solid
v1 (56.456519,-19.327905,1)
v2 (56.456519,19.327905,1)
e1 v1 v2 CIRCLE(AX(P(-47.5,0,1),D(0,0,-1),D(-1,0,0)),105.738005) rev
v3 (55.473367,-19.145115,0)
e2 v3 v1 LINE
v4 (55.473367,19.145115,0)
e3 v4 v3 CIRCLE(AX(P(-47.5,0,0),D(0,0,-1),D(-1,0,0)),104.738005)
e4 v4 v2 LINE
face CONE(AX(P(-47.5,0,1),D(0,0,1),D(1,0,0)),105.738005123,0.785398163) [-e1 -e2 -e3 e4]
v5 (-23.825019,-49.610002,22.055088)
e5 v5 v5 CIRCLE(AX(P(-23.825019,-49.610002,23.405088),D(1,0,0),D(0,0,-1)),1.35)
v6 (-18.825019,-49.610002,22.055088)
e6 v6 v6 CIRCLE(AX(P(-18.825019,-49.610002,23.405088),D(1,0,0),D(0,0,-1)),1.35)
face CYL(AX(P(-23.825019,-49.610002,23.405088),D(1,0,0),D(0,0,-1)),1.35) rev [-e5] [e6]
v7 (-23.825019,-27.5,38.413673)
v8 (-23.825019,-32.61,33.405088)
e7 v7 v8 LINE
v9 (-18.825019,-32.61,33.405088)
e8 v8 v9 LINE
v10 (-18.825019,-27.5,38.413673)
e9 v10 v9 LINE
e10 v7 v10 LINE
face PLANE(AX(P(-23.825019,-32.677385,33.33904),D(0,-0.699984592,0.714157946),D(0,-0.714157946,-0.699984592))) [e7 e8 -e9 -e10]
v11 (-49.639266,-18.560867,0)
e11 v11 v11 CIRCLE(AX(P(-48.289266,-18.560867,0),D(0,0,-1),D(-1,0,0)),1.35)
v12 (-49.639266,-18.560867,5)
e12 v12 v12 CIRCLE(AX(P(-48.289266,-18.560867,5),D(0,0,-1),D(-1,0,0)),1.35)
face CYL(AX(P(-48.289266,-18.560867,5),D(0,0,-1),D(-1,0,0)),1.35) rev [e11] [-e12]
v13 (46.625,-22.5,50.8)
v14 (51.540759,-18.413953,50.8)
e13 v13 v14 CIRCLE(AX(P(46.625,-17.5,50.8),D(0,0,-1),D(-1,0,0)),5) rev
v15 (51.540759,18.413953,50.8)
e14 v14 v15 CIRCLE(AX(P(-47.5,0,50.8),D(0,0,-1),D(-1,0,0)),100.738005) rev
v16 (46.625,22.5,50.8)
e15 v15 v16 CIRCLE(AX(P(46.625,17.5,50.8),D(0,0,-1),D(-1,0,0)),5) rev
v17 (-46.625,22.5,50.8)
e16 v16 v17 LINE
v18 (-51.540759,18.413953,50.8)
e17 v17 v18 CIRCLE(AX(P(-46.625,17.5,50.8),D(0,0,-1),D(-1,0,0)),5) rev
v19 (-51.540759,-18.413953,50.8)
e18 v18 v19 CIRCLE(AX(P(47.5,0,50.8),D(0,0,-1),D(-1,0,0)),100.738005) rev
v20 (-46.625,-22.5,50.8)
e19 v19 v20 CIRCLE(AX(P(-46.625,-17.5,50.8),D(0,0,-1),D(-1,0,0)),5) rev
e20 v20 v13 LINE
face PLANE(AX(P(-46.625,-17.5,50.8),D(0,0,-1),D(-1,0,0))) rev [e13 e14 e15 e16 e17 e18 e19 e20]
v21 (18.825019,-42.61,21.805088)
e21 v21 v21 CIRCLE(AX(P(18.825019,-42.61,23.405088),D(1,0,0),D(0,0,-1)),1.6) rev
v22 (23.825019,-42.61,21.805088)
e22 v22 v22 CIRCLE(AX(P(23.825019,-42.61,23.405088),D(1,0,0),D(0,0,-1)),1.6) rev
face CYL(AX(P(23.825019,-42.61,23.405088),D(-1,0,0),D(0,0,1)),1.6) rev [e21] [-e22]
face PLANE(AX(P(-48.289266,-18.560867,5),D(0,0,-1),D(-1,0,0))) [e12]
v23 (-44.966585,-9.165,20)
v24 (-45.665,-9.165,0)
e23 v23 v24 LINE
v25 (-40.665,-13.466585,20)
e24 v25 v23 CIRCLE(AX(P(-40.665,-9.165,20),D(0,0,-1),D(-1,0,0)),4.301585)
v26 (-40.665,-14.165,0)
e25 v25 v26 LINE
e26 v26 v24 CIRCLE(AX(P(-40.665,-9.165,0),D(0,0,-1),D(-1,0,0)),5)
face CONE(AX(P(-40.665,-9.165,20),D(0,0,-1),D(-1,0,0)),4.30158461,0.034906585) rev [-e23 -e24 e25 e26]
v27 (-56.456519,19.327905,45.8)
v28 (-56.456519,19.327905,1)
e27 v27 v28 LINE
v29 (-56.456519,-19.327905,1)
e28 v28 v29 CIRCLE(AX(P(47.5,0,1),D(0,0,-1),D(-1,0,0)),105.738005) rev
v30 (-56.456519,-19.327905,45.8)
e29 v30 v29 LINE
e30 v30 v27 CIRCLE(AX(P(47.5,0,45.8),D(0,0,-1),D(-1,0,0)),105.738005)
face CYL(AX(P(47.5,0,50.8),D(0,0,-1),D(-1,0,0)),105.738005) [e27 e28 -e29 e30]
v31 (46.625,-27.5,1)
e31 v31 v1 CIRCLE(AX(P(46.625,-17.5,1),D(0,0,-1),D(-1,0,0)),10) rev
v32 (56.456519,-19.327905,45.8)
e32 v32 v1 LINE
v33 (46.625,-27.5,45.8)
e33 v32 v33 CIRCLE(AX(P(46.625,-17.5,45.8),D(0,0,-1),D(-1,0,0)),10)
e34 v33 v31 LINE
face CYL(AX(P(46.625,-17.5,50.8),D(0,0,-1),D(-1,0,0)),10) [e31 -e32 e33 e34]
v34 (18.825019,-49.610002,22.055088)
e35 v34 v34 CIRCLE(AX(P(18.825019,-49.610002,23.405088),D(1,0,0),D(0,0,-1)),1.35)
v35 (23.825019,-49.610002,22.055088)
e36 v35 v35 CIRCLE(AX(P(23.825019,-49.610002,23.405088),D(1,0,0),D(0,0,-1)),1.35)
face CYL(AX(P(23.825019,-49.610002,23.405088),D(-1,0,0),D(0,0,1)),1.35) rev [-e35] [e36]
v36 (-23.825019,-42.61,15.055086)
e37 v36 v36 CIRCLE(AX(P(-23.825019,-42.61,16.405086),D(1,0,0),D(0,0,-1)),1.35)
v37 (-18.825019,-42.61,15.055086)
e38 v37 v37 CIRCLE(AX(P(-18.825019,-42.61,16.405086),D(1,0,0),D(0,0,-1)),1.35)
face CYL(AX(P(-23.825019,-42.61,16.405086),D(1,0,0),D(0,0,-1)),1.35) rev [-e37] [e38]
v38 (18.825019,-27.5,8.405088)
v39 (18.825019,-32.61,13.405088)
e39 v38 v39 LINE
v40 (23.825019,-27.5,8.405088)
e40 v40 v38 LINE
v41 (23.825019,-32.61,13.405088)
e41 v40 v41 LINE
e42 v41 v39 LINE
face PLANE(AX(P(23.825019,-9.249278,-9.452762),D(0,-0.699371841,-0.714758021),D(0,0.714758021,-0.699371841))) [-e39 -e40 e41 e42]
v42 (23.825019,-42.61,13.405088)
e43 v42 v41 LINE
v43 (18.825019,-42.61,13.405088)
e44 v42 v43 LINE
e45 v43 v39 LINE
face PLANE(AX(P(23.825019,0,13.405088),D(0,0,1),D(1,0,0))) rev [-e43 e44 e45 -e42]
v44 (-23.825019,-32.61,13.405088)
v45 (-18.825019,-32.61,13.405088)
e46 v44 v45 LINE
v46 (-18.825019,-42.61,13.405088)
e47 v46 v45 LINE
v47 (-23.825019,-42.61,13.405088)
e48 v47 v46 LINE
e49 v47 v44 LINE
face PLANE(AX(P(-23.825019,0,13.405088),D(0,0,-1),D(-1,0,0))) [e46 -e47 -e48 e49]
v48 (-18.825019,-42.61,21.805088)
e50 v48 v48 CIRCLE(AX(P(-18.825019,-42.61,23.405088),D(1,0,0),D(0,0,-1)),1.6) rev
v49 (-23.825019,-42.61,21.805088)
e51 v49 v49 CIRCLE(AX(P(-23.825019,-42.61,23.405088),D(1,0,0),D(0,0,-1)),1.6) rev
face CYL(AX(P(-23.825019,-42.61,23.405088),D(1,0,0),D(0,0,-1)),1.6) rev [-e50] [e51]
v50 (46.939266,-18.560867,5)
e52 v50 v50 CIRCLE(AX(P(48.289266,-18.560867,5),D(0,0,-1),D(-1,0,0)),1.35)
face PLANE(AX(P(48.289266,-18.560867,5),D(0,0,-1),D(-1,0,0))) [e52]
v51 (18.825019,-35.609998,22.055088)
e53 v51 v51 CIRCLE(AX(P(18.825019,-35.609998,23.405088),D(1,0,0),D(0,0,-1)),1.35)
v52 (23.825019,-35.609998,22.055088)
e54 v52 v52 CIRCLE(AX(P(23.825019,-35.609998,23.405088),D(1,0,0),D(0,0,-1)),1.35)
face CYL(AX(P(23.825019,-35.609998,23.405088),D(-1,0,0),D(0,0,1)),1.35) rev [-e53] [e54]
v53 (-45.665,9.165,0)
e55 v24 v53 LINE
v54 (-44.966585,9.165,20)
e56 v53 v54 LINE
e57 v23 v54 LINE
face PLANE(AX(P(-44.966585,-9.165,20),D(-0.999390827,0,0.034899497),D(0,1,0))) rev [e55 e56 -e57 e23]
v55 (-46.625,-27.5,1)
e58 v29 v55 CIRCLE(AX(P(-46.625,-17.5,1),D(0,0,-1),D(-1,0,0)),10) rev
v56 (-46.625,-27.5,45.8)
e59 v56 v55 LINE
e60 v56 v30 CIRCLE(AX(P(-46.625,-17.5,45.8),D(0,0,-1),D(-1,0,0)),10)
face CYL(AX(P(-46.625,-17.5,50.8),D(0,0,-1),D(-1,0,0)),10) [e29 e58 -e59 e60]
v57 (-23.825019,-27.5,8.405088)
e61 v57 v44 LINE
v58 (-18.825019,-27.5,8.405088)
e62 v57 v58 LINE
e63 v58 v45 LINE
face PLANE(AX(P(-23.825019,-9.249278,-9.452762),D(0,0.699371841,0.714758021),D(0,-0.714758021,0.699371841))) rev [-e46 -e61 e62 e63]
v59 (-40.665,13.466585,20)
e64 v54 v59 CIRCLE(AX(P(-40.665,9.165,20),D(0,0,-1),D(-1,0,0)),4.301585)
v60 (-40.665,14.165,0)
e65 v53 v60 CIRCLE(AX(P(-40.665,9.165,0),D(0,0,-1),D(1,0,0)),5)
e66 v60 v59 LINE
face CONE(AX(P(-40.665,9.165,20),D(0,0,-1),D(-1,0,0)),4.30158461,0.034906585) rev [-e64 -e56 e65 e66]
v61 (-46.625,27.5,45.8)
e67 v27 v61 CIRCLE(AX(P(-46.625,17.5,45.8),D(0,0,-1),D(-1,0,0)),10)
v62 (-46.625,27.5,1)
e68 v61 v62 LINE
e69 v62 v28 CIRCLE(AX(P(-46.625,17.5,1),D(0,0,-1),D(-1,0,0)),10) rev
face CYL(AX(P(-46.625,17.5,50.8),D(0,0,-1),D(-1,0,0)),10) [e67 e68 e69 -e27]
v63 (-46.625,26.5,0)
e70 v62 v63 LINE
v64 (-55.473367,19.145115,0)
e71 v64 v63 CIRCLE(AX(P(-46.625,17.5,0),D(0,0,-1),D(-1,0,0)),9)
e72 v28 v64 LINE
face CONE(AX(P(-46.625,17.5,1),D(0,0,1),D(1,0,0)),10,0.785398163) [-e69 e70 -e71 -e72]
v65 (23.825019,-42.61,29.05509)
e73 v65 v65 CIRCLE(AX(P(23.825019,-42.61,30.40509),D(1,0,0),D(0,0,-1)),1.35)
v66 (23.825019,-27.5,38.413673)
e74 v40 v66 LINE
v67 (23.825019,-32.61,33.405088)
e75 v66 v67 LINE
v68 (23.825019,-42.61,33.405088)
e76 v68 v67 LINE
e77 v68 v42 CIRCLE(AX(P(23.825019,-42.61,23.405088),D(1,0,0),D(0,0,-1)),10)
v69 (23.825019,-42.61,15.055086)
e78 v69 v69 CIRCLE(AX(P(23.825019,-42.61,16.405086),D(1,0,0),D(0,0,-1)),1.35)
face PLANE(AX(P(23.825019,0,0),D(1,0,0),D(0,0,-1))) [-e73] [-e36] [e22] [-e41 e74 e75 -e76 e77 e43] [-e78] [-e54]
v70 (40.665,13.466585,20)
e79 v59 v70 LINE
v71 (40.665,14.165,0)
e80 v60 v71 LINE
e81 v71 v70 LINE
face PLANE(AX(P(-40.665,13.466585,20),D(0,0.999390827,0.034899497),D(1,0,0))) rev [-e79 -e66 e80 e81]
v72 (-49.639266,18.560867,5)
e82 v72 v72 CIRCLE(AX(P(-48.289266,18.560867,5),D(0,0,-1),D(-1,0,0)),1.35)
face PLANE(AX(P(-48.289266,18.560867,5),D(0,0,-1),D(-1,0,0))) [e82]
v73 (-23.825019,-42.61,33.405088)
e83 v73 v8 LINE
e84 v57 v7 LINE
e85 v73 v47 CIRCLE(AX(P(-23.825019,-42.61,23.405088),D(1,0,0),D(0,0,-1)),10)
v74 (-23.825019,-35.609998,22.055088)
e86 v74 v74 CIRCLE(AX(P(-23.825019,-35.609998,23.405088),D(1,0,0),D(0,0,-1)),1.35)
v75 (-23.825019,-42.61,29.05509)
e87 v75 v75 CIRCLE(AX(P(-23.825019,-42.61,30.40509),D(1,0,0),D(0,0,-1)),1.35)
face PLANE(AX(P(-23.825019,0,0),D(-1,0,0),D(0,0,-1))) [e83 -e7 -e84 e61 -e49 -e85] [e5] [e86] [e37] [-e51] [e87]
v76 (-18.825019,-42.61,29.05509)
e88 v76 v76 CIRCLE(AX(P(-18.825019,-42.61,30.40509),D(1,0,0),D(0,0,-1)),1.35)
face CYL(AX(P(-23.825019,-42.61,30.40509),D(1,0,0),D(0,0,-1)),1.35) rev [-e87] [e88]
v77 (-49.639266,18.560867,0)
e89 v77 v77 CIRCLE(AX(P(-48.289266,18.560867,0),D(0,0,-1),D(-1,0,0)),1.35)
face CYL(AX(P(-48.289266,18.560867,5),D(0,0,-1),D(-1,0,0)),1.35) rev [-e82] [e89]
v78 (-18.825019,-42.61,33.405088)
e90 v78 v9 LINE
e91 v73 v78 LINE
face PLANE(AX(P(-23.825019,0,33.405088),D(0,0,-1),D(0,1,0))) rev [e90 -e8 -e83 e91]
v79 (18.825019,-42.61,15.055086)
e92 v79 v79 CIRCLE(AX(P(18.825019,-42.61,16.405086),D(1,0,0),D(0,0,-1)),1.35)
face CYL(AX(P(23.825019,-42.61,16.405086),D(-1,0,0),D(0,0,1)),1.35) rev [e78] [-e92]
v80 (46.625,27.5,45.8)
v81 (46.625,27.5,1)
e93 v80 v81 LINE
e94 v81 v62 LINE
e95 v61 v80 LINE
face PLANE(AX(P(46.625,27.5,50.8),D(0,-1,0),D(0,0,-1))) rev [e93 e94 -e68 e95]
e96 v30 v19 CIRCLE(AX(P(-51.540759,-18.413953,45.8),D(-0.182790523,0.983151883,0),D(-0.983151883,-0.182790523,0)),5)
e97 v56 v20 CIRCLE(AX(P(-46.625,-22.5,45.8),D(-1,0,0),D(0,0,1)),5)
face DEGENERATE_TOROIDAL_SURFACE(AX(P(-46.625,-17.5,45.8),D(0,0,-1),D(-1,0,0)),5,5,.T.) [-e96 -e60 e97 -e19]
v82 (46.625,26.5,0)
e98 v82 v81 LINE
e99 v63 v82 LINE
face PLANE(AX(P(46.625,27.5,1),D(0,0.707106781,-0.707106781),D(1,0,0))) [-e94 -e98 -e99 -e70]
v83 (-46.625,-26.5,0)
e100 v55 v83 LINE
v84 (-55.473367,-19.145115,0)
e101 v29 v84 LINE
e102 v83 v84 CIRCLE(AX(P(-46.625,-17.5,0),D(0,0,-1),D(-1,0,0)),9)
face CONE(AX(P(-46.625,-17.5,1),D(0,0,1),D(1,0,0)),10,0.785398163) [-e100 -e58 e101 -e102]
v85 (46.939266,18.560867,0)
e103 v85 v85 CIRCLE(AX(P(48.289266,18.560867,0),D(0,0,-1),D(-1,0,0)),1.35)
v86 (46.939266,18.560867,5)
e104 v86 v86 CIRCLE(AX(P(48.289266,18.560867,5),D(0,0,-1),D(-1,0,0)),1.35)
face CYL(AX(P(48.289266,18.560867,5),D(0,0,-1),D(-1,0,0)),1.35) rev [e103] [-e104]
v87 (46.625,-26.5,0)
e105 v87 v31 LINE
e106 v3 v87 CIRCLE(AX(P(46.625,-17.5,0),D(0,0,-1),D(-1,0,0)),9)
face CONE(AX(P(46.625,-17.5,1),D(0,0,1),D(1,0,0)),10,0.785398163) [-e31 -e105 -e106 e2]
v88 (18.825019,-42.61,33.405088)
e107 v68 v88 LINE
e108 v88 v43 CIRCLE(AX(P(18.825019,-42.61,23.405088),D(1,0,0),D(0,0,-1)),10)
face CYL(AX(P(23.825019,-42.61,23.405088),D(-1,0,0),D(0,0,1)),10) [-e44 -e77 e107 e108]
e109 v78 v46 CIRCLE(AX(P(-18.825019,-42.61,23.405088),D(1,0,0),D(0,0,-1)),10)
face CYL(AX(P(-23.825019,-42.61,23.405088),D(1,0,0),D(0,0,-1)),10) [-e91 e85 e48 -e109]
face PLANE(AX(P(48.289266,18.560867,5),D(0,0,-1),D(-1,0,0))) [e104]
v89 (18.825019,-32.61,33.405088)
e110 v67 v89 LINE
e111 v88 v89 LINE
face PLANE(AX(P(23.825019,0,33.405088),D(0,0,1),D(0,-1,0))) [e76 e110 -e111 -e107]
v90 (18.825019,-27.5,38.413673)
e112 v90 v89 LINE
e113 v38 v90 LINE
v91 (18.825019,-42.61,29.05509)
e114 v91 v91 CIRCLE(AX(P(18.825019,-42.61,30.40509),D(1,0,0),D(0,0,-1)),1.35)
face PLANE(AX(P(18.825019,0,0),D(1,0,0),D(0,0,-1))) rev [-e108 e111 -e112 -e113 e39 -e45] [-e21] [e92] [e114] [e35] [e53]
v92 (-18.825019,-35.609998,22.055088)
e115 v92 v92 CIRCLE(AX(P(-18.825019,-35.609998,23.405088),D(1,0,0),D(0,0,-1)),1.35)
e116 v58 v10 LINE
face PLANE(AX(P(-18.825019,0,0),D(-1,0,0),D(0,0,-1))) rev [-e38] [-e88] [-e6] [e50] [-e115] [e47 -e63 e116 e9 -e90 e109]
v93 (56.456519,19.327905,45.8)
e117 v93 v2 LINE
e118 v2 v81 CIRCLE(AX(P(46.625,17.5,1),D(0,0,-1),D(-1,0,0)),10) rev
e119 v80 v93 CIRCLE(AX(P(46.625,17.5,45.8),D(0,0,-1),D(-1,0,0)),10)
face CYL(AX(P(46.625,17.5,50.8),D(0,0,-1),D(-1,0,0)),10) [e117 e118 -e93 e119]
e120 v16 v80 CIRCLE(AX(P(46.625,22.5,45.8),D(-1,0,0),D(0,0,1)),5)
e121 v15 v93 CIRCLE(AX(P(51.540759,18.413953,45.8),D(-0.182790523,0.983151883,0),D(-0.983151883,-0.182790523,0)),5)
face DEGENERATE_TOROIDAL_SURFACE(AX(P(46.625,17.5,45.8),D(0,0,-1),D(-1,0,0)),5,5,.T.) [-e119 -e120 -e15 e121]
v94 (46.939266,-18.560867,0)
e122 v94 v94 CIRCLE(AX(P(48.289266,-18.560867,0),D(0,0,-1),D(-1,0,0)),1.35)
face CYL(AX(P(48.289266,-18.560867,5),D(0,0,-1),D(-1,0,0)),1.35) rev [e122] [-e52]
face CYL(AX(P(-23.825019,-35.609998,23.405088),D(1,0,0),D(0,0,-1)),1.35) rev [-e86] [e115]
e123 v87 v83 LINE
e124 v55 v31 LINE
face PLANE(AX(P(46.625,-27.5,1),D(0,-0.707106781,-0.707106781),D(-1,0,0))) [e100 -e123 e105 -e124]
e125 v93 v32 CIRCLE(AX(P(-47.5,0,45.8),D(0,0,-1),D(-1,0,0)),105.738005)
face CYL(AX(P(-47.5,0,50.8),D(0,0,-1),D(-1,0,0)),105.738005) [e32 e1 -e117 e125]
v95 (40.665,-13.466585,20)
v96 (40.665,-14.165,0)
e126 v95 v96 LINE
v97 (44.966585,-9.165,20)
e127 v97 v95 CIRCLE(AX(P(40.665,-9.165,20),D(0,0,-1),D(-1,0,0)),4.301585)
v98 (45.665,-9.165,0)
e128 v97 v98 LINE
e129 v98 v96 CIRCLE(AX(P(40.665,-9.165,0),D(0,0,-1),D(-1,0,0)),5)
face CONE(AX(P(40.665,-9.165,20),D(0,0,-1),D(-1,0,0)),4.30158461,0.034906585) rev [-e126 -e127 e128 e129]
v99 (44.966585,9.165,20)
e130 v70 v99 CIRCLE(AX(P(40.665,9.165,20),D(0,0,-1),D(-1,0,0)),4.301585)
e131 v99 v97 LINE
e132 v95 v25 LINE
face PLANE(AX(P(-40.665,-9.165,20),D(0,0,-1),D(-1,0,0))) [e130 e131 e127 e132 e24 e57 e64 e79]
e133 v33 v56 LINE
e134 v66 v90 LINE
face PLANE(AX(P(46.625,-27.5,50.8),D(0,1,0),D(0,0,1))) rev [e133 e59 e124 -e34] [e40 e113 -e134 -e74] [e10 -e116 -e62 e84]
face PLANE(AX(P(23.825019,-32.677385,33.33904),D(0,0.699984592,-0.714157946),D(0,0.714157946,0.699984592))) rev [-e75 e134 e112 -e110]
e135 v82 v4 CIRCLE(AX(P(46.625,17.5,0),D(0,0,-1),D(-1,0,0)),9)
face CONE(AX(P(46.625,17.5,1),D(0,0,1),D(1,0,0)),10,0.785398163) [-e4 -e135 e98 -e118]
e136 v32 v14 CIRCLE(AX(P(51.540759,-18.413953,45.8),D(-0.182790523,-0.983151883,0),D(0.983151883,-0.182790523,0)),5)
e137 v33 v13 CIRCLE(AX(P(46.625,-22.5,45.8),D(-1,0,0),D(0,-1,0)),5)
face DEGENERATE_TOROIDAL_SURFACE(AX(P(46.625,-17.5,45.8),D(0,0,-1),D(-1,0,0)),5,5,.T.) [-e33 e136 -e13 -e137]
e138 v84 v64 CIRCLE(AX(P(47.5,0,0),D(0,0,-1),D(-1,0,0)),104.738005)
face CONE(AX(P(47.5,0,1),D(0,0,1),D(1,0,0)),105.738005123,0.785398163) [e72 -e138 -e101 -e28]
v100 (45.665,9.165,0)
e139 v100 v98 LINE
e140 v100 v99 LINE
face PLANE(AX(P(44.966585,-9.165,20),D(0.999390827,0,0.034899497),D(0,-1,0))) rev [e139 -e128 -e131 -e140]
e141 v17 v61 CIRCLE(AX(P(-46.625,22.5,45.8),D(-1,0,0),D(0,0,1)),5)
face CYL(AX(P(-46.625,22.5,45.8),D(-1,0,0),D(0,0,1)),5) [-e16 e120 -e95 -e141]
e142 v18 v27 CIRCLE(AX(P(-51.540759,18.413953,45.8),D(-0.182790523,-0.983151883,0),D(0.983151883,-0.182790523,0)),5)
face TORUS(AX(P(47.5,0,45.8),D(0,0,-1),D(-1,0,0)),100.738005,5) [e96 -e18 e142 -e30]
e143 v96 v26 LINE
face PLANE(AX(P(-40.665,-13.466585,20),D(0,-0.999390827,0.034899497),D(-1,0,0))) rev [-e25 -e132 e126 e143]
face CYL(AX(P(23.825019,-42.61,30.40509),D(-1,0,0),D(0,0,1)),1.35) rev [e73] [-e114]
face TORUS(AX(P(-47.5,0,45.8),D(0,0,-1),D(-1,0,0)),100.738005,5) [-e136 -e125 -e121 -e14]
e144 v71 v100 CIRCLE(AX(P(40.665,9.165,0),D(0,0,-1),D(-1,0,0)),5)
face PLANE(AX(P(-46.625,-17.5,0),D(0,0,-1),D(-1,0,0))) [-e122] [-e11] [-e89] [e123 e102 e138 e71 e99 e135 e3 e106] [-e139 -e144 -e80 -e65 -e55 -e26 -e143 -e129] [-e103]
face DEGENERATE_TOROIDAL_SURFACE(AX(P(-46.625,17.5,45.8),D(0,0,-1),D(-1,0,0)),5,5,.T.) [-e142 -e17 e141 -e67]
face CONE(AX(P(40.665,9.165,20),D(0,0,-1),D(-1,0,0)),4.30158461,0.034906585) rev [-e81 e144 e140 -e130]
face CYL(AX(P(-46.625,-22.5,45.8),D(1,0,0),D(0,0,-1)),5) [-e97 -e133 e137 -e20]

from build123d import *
from OCP.BRepFilletAPI import BRepFilletAPI_MakeChamfer

# Parameters (mm, degrees)
BOSS_EXTRUDE5_DEPTH = 50.8
FILLET9_R           = 5
CHAMFER1_SIZE       = 1
SKETCH8_R           = 1.35
BOSS_EXTRUDE6_DEPTH = 5
CUT_EXTRUDE3_DEPTH  = 20
CHAMFER2_SIZE       = 20
CHAMFER2_SIZE_2     = 0.69841539
SKETCH15_R          = 1.35
CUT_EXTRUDE4_DEPTH  = 5


with BuildPart() as part:
    # Sketch2 → Boss-Extrude5 (new body)
    with BuildSketch(Plane.XY):
        with BuildLine():
            Line((46.625, 27.5), (-46.625, 27.5))
            ThreePointArc((-46.625, 27.5), (-53.017219792, 25.190222762), (-56.456518829, 19.327905227))
            ThreePointArc((-56.456518829, 19.327905227), (-58.238005123, 0), (-56.456518829, -19.327905227))
            ThreePointArc((-56.456518829, -19.327905227), (-53.017219792, -25.190222762), (-46.625, -27.5))
            Line((-46.625, -27.5), (46.625, -27.5))
            ThreePointArc((46.625, -27.5), (53.017219792, -25.190222762), (56.456518829, -19.327905227))
            ThreePointArc((56.456518829, -19.327905227), (58.238005123, 0), (56.456518829, 19.327905227))
            ThreePointArc((56.456518829, 19.327905227), (53.017219792, 25.190222762), (46.625, 27.5))
        make_face()
    extrude(amount=BOSS_EXTRUDE5_DEPTH)

    # Fillet9
    fillet9_edges = [part.edges().sort_by_distance(p)[0] for p in [
        (53.017219792, -25.190222762, 50.8),
        (58.238005123, 0, 50.8),
        (53.017219792, 25.190222762, 50.8),
        (0, 27.5, 50.8),
        (-53.017219792, 25.190222762, 50.8),
        (-58.238005123, 0, 50.8),
        (-53.017219792, -25.190222762, 50.8),
        (0, -27.5, 50.8),
    ]]
    fillet(fillet9_edges, radius=FILLET9_R)

    # Chamfer1
    chamfer1_edges = [part.edges().sort_by_distance(p)[0] for p in [
        (58.238005123, 0, 0),
        (53.017219792, -25.190222762, 0),
        (0, -27.5, 0),
        (-53.017219792, -25.190222762, 0),
        (-58.238005123, 0, 0),
        (-53.017219792, 25.190222762, 0),
        (0, 27.5, 0),
        (53.017219792, 25.190222762, 0),
    ]]
    chamfer(chamfer1_edges, length=CHAMFER1_SIZE)

    # Sketch8 → Boss-Extrude6 (add)
    # profile 1 of 2: a face of its own
    with BuildSketch(Plane(origin=(18.825019181, 0, 0), x_dir=(0, 0, -1), z_dir=(1, 0, 0))):
        with BuildLine():
            Line((-13.405087735, -32.61), (-8.405087735, -27.5))
            Line((-8.405087735, -27.5), (-13.405087735, -27.5))
            Line((-13.405087735, -27.5), (-33.413673421, -27.5))
            Line((-33.413673421, -27.5), (-38.413673421, -27.5))
            Line((-38.413673421, -27.5), (-33.405087735, -32.61))
            Line((-33.405087735, -32.61), (-33.405087735, -42.61))
            ThreePointArc((-33.405087735, -42.61), (-23.405087735, -52.61), (-13.405087735, -42.61))
            Line((-13.405087735, -42.61), (-13.405087735, -32.61))
        make_face()
        with BuildLine():
            ThreePointArc((-33.105086536, -42.61), (-23.405087735, -32.910001198), (-13.705088933, -42.61))
            ThreePointArc((-13.705088933, -42.61), (-23.405087735, -52.309998802), (-33.105086536, -42.61))
        make_face(mode=Mode.SUBTRACT)
    # profile 2 of 2: a face of its own
    with BuildSketch(Plane(origin=(18.825019181, 0, 0), x_dir=(0, 0, -1), z_dir=(1, 0, 0))):
        with BuildLine():
            ThreePointArc((-33.105086536, -42.61), (-23.405087735, -52.309998802), (-13.705088933, -42.61))
            ThreePointArc((-13.705088933, -42.61), (-23.405087735, -32.910001198), (-33.105086536, -42.61))
        make_face()
        with Locations((-30.405089608, -42.61)):
            Circle(SKETCH8_R, mode=Mode.SUBTRACT)
        with Locations((-23.405087735, -49.610001873)):
            Circle(SKETCH8_R, mode=Mode.SUBTRACT)
        with Locations((-16.405085862, -42.61)):
            Circle(SKETCH8_R, mode=Mode.SUBTRACT)
        with Locations((-23.405087735, -35.609998127)):
            Circle(SKETCH8_R, mode=Mode.SUBTRACT)
        with BuildLine():
            ThreePointArc((-21.805087735, -42.61), (-23.405087735, -44.21), (-25.005087735, -42.61))
            ThreePointArc((-25.005087735, -42.61), (-23.405087735, -41.01), (-21.805087735, -42.61))
        make_face(mode=Mode.SUBTRACT)
    boss_extrude6 = extrude(amount=BOSS_EXTRUDE6_DEPTH)

    # Mirror1: Boss-Extrude6 across plane
    add(boss_extrude6.mirror(Plane(origin=(0, 0, 0), x_dir=(0, 0, 1), z_dir=(1, 0, 0))))

    # Sketch4 → Cut-Extrude3 (cut)
    with BuildSketch(Plane(origin=(0, 0, 0), x_dir=(-1, 0, 0), z_dir=(0, 0, -1))):
        with BuildLine():
            Line((-40.665, 14.165), (40.665, 14.165))
            ThreePointArc((40.665, 14.165), (44.200533906, 12.700533906), (45.665, 9.165))
            Line((45.665, 9.165), (45.665, -9.165))
            ThreePointArc((45.665, -9.165), (44.200533906, -12.700533906), (40.665, -14.165))
            Line((40.665, -14.165), (-40.665, -14.165))
            ThreePointArc((-40.665, -14.165), (-44.200533906, -12.700533906), (-45.665, -9.165))
            Line((-45.665, -9.165), (-45.665, 9.165))
            ThreePointArc((-45.665, 9.165), (-44.200533906, 12.700533906), (-40.665, 14.165))
        make_face()
    extrude(amount=-CUT_EXTRUDE3_DEPTH, mode=Mode.SUBTRACT)

    # Chamfer2
    chamfer2_edges_1 = [part.edges().sort_by_distance(p)[0] for p in [
        (-45.665, 0, 20),
    ]]
    chamfer2_side_1 = [part.faces().sort_by_distance(p)[0] for p in [
        (-45.665, 0, 19.986031692),
    ]]
    chamfer2_edges_2 = [part.edges().sort_by_distance(p)[0] for p in [
        (-44.200533906, 12.700533906, 20),
    ]]
    chamfer2_side_2 = [part.faces().sort_by_distance(p)[0] for p in [
        (-44.200533906, 12.700533906, 19.986031692),
    ]]
    chamfer2_edges_3 = [part.edges().sort_by_distance(p)[0] for p in [
        (-44.200533906, -12.700533906, 20),
    ]]
    chamfer2_side_3 = [part.faces().sort_by_distance(p)[0] for p in [
        (-44.200533906, -12.700533906, 19.986031692),
    ]]
    chamfer2_edges_4 = [part.edges().sort_by_distance(p)[0] for p in [
        (0, 14.165, 20),
    ]]
    chamfer2_side_4 = [part.faces().sort_by_distance(p)[0] for p in [
        (0, 14.165, 19.986031692),
    ]]
    chamfer2_edges_5 = [part.edges().sort_by_distance(p)[0] for p in [
        (0, -14.165, 20),
    ]]
    chamfer2_side_5 = [part.faces().sort_by_distance(p)[0] for p in [
        (0, -14.165, 19.986031692),
    ]]
    chamfer2_edges_6 = [part.edges().sort_by_distance(p)[0] for p in [
        (44.200533906, 12.700533906, 20),
    ]]
    chamfer2_side_6 = [part.faces().sort_by_distance(p)[0] for p in [
        (44.200533906, 12.700533906, 19.986031692),
    ]]
    chamfer2_edges_7 = [part.edges().sort_by_distance(p)[0] for p in [
        (44.200533906, -12.700533906, 20),
    ]]
    chamfer2_side_7 = [part.faces().sort_by_distance(p)[0] for p in [
        (44.200533906, -12.700533906, 19.986031692),
    ]]
    chamfer2_edges_8 = [part.edges().sort_by_distance(p)[0] for p in [
        (45.665, 0, 20),
    ]]
    chamfer2_side_8 = [part.faces().sort_by_distance(p)[0] for p in [
        (45.665, 0, 19.986031692),
    ]]
    chamfer2 = BRepFilletAPI_MakeChamfer(part.part.solid().wrapped)
    for e in chamfer2_edges_1:
        chamfer2.Add(CHAMFER2_SIZE - 0.0001, CHAMFER2_SIZE_2 - 0.0001, e.wrapped, chamfer2_side_1[0].wrapped)
    for e in chamfer2_edges_2:
        chamfer2.Add(CHAMFER2_SIZE - 0.0001, CHAMFER2_SIZE_2 - 0.0001, e.wrapped, chamfer2_side_2[0].wrapped)
    for e in chamfer2_edges_3:
        chamfer2.Add(CHAMFER2_SIZE - 0.0001, CHAMFER2_SIZE_2 - 0.0001, e.wrapped, chamfer2_side_3[0].wrapped)
    for e in chamfer2_edges_4:
        chamfer2.Add(CHAMFER2_SIZE - 0.0001, CHAMFER2_SIZE_2 - 0.0001, e.wrapped, chamfer2_side_4[0].wrapped)
    for e in chamfer2_edges_5:
        chamfer2.Add(CHAMFER2_SIZE - 0.0001, CHAMFER2_SIZE_2 - 0.0001, e.wrapped, chamfer2_side_5[0].wrapped)
    for e in chamfer2_edges_6:
        chamfer2.Add(CHAMFER2_SIZE - 0.0001, CHAMFER2_SIZE_2 - 0.0001, e.wrapped, chamfer2_side_6[0].wrapped)
    for e in chamfer2_edges_7:
        chamfer2.Add(CHAMFER2_SIZE - 0.0001, CHAMFER2_SIZE_2 - 0.0001, e.wrapped, chamfer2_side_7[0].wrapped)
    for e in chamfer2_edges_8:
        chamfer2.Add(CHAMFER2_SIZE - 0.0001, CHAMFER2_SIZE_2 - 0.0001, e.wrapped, chamfer2_side_8[0].wrapped)
    add(Compound.cast(chamfer2.Shape()), mode=Mode.REPLACE)  # a hair under: the kernel refuses the full size

    # Sketch15 → Cut-Extrude4 (cut)
    with BuildSketch(Plane(origin=(0, 0, 0), x_dir=(-1, 0, 0), z_dir=(0, 0, -1))):
        with Locations((-48.289265859, 18.560867196)):
            Circle(SKETCH15_R)
        with Locations((48.289265859, -18.560867196)):
            Circle(SKETCH15_R)
        with Locations((48.289265859, 18.560867196)):
            Circle(SKETCH15_R)
        with Locations((-48.289265859, -18.560867196)):
            Circle(SKETCH15_R)
    extrude(amount=-CUT_EXTRUDE4_DEPTH, mode=Mode.SUBTRACT)


solid = part.part
